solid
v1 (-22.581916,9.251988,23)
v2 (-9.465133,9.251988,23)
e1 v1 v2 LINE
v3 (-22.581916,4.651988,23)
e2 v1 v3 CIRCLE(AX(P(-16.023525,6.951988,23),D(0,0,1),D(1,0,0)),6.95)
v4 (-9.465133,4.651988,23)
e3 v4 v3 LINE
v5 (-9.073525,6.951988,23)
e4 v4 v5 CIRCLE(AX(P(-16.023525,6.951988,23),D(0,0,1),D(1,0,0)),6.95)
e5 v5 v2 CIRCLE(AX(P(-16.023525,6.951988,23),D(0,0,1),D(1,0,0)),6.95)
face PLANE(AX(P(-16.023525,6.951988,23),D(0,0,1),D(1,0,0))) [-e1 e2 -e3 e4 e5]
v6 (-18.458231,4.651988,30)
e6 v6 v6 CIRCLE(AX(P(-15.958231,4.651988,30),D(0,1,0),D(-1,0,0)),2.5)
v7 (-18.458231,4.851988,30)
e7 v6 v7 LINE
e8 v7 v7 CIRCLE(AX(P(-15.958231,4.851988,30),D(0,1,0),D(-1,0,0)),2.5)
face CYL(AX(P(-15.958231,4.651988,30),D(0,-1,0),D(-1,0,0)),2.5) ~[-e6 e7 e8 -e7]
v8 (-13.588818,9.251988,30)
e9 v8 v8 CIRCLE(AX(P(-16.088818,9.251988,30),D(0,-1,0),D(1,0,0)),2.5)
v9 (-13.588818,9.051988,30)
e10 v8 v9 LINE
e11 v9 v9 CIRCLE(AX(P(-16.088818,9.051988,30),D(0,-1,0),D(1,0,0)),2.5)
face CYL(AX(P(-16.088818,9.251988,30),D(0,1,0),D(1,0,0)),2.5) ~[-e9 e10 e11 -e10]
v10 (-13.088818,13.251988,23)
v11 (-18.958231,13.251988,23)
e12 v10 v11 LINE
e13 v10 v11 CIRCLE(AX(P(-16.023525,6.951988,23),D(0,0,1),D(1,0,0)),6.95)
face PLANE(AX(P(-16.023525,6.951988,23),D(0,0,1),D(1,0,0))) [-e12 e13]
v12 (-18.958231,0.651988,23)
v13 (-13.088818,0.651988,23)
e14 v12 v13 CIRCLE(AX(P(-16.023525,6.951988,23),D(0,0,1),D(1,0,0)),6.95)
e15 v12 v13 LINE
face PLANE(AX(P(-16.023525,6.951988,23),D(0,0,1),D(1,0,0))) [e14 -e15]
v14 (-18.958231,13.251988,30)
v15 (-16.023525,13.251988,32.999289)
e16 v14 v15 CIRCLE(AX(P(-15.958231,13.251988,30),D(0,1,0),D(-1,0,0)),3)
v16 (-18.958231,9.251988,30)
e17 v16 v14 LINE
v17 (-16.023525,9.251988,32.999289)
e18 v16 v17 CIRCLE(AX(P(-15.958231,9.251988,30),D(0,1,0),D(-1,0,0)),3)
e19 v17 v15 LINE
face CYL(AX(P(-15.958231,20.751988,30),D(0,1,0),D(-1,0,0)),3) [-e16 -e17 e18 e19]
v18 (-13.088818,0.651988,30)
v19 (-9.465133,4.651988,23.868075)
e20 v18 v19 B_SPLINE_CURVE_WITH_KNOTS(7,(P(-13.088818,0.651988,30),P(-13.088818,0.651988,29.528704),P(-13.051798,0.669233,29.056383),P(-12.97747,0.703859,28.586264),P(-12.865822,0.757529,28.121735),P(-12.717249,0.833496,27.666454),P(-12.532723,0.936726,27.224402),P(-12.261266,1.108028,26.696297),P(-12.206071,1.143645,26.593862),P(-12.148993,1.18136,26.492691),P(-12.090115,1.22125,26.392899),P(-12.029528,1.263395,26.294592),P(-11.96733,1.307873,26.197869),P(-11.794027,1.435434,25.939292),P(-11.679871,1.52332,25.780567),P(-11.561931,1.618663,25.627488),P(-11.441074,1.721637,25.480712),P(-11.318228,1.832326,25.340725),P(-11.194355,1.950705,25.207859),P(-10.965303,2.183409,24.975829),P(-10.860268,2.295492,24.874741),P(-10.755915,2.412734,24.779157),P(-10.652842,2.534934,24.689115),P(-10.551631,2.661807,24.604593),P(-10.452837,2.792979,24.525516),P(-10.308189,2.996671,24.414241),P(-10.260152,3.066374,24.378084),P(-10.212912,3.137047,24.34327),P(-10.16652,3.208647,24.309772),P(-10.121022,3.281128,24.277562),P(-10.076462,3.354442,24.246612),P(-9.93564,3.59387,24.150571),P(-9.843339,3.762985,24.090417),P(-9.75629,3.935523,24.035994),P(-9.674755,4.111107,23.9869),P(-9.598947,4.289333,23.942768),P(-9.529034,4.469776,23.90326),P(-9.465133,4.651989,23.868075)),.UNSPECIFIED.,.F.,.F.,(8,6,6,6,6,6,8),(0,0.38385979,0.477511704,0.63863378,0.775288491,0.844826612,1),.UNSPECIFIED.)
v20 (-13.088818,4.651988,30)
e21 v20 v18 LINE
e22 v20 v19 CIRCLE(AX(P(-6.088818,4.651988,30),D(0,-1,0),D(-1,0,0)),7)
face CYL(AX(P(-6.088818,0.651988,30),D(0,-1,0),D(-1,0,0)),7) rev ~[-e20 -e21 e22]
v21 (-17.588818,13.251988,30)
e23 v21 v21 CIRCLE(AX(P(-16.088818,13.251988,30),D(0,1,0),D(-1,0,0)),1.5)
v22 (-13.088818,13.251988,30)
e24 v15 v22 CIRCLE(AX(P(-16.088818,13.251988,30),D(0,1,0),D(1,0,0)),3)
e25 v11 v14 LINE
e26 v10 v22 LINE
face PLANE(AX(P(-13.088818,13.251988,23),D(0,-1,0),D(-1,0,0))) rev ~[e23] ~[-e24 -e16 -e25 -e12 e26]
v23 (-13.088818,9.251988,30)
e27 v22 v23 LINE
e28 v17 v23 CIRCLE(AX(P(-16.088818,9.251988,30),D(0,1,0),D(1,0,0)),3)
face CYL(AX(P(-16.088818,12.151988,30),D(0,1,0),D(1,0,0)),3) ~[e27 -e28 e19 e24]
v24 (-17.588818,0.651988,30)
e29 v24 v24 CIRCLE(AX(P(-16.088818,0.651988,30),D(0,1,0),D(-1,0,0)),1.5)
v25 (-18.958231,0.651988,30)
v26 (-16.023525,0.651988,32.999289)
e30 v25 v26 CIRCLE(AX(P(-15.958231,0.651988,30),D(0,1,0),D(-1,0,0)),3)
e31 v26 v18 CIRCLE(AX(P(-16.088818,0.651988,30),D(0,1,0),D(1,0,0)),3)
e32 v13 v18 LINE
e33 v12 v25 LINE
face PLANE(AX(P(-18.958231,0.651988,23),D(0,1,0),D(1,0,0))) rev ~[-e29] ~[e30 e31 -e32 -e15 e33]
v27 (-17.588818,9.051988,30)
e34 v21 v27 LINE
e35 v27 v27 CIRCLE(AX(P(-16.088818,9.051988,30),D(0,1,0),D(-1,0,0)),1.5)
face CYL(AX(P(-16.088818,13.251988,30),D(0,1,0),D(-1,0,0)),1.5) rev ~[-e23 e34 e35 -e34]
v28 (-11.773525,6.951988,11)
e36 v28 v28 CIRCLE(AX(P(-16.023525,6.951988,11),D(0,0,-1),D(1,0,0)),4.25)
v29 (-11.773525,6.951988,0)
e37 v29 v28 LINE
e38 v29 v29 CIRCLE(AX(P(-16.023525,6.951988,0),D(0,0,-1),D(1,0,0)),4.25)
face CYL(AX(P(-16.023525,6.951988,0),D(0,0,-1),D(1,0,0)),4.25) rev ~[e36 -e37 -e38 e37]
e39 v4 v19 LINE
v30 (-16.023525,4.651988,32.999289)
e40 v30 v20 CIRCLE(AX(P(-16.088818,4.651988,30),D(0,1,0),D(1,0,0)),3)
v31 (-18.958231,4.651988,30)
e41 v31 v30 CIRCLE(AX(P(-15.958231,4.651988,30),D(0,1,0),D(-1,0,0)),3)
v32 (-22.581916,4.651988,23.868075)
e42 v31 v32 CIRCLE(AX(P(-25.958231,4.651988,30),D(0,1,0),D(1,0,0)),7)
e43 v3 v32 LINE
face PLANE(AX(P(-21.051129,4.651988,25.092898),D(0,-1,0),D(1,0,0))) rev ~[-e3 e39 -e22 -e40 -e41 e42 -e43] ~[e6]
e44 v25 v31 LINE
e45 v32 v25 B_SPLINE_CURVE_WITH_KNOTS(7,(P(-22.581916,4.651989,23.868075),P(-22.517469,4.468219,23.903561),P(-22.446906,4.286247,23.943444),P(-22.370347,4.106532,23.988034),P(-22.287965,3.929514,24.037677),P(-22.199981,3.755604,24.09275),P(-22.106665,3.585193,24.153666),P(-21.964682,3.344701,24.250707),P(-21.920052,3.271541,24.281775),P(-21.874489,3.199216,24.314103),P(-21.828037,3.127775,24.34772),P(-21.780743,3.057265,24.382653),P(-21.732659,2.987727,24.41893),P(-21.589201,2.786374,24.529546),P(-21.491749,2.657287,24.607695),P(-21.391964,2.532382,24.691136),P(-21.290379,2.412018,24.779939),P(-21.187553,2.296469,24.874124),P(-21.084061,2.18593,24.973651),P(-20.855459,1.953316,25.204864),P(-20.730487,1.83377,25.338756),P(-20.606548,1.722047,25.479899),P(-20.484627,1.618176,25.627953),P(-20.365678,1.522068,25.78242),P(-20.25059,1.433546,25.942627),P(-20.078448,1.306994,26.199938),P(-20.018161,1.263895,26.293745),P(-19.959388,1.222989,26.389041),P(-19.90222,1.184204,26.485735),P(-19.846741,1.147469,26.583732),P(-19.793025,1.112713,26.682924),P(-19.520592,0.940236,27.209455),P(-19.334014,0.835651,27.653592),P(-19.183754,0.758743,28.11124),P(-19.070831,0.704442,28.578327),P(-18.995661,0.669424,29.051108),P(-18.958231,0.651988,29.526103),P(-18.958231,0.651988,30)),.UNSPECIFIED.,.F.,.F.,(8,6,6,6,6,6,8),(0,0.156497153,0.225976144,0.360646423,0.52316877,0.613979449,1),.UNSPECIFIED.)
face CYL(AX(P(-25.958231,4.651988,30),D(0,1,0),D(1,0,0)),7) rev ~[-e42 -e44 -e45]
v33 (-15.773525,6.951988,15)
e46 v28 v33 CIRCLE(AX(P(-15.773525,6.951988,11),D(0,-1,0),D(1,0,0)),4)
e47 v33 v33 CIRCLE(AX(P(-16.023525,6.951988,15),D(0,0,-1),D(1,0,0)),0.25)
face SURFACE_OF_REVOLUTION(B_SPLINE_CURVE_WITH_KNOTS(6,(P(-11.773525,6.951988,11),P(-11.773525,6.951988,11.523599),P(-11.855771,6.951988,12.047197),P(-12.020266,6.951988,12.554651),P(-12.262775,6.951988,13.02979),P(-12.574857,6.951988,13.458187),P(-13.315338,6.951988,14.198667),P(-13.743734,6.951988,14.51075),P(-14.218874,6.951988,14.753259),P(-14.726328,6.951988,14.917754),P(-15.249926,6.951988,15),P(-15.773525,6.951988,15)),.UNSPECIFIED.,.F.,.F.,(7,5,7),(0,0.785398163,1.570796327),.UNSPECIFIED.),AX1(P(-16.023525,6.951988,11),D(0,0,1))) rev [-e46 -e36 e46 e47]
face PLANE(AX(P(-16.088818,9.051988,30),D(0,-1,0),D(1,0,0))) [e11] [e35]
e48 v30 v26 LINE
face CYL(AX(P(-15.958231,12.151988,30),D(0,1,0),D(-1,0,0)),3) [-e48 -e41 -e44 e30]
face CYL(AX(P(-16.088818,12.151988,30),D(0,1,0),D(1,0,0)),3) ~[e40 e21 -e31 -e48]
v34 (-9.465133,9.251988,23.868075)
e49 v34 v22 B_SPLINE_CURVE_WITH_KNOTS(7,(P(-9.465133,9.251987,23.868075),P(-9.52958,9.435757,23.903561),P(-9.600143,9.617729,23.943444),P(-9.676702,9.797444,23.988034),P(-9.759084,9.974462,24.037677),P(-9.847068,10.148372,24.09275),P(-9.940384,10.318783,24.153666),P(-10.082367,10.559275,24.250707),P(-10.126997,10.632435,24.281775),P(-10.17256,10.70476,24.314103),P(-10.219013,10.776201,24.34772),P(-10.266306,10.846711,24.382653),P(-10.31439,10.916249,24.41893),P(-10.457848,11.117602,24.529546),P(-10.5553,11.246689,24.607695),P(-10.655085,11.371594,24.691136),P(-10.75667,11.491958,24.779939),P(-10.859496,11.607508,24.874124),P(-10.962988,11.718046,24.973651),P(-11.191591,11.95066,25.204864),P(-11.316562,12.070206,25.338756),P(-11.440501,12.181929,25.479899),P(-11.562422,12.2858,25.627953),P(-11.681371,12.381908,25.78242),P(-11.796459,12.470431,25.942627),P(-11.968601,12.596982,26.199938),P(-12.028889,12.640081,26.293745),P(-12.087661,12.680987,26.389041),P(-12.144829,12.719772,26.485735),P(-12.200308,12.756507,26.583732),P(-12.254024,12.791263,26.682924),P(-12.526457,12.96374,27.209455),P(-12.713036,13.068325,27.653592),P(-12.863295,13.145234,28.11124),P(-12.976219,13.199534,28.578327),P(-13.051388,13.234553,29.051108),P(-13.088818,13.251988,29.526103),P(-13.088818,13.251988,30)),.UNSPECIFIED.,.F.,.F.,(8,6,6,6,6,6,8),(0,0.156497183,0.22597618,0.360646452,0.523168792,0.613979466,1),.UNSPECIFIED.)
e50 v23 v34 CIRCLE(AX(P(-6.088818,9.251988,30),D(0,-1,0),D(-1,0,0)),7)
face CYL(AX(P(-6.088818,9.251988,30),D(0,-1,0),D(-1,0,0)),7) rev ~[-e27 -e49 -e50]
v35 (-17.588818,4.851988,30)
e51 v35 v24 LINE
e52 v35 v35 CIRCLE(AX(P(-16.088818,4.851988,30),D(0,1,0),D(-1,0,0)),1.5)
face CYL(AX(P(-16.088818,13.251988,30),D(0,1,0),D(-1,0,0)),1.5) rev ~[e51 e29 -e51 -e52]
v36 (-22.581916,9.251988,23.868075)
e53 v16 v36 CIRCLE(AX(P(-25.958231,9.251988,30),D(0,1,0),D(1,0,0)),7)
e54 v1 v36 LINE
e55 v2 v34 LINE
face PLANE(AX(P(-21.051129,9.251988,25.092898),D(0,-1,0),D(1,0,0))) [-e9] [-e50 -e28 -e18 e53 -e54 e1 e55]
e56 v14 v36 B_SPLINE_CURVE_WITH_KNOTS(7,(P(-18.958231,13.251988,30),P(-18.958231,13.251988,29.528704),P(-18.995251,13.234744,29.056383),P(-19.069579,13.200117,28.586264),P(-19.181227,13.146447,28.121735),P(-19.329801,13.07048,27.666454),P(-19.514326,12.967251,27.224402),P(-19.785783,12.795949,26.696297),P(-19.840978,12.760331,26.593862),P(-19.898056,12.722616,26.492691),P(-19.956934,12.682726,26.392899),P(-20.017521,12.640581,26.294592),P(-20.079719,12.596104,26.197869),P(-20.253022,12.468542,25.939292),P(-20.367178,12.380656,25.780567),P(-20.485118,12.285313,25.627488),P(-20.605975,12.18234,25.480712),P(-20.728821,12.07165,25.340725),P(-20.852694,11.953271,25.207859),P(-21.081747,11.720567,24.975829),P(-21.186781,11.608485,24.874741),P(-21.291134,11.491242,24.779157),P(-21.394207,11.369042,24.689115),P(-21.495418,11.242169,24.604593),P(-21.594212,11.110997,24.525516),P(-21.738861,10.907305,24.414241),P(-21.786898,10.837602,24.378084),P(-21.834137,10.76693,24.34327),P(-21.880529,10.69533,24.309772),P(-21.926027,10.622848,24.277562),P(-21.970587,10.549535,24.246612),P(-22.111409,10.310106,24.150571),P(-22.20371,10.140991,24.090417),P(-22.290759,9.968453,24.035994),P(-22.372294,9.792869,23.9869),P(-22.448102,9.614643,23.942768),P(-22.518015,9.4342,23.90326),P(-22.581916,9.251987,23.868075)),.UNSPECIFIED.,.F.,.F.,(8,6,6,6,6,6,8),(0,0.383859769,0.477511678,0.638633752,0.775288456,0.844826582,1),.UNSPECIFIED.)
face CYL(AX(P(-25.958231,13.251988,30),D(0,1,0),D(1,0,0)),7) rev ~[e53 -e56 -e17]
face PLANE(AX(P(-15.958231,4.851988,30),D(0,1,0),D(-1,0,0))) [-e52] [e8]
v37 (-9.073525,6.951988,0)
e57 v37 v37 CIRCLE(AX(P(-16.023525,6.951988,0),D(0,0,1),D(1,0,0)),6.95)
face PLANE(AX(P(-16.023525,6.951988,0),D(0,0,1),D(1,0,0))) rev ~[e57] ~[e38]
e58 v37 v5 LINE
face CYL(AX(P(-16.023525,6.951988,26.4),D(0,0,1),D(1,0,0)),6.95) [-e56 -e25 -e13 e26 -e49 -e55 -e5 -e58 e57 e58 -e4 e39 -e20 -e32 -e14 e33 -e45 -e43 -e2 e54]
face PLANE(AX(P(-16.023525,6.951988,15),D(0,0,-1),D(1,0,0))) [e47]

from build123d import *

# Parameters (mm, degrees)
F0_R         = 6.95
F1_DEPTH     = 23
F2_W         = 2.9347061182
F2_H         = 4
F3_DEPTH     = 10
F4_T1_DEPTH  = 19
F4_T3_DEPTH  = 19
F5_T4_DEPTH  = 4
F5_S5_R      = 6.95
F5_T6_DEPTH  = 7
F5_T10_DEPTH = 4
F5_S11_R     = 6.95
F5_T12_DEPTH = 7
F5_T16_DEPTH = 4
F5_S17_R     = 6.95
F5_T18_DEPTH = 7
F5_T22_DEPTH = 4
F5_S23_R     = 6.95
F5_T24_DEPTH = 7
F6_R         = 4.25
F7_DEPTH     = 15
F8_R         = 4
F10_R        = 2.5
F11_DEPTH    = 0.2
F12_R        = 2.5
F13_DEPTH    = 0.2
F9_R         = 1.5
F14_DEPTH    = 13.2510001


# Not quite as in the source:
# - a fillet or chamfer that OpenCascade refuses, or shapes differently, is made with other operations: its cross-section is extruded or revolved along the edge and cut away or added


with BuildPart() as f1:
    # F0 (on Top) → F1 (new body)
    with BuildSketch(Plane.XY):
        with Locations((-16.023524542, 6.9519880981)):
            Circle(F0_R)
    extrude(amount=F1_DEPTH)

    # F2 (on face) → F3 (join)
    with BuildSketch(Plane.XY.offset(23)):
        with Locations((-17.490877601, 11.2519880981)):
            Rectangle(F2_W, F2_H)
        with Locations((-14.5561714829, 11.2519880981)):
            Rectangle(F2_W, F2_H)
        with Locations((-17.490877601, 2.6519880981)):
            Rectangle(F2_W, F2_H)
        with Locations((-14.5561714829, 2.6519880981)):
            Rectangle(F2_W, F2_H)
    extrude(amount=F3_DEPTH)

    # F4: fillet of radius 3 on 4 edges, made by hand

    # F4_s2 → F4_t1 (cut)
    with BuildSketch(Plane.XZ.offset(-12.1519880981)):
        with BuildLine():
            ThreePointArc((-13.0888184238, 30), (-13.9674980802, 32.1213203436), (-16.0888184238, 33))
            Line((-16.0888184238, 33), (-13.0888184238, 33))
            Line((-13.0888184238, 33), (-13.0888184238, 30))
        make_face()
        with BuildLine():
            ThreePointArc((-18.9582306601, 30), (-18.0795510037, 32.1213203436), (-15.9582306601, 33))
            Line((-15.9582306601, 33), (-18.9582306601, 33))
            Line((-18.9582306601, 33), (-18.9582306601, 30))
        make_face()
    extrude(amount=F4_T1_DEPTH, mode=Mode.SUBTRACT)

    # F4_s4 → F4_t3 (cut)
    with BuildSketch(Plane.XZ.offset(-20.7519880981)):
        with BuildLine():
            ThreePointArc((-13.0888184238, 30), (-13.9674980802, 32.1213203436), (-16.0888184238, 33))
            Line((-16.0888184238, 33), (-13.0888184238, 33))
            Line((-13.0888184238, 33), (-13.0888184238, 30))
        make_face()
        with BuildLine():
            ThreePointArc((-18.9582306601, 30), (-18.0795510037, 32.1213203436), (-15.9582306601, 33))
            Line((-15.9582306601, 33), (-18.9582306601, 33))
            Line((-18.9582306601, 33), (-18.9582306601, 30))
        make_face()
    extrude(amount=F4_T3_DEPTH, mode=Mode.SUBTRACT)

    # F5: fillet of radius 7 on 4 edges, made by hand


with BuildPart() as f5_tool2:
    # F5_s3 → F5_t4 (new body)
    with BuildSketch(Plane.XZ.offset(-0.6519880981)):
        with BuildLine():
            ThreePointArc((-13.0888184238, 30), (-11.0385658921, 25.0502525317), (-6.0888184238, 23))
            Line((-6.0888184238, 23), (-6.0888184238, 22.86))
            Line((-6.0888184238, 22.86), (-13.2288184238, 22.86))
            Line((-13.2288184238, 22.86), (-13.2288184238, 30))
            Line((-13.2288184238, 30), (-13.0888184238, 30))
        make_face()
    extrude(amount=-F5_T4_DEPTH)

    # F5_s5 → F5_t6 (intersect, symmetric)
    with BuildSketch(Plane.XY.offset(26.4)):
        with Locations((-16.023524542, 6.9519880981)):
            Circle(F5_S5_R)
    extrude(amount=F5_T6_DEPTH, both=True, mode=Mode.INTERSECT)


with BuildPart() as f1_1:
    add(f1.part)

    # F5_t1: union F5_tool2
    add(f5_tool2.part)


with BuildPart() as f5_tool8:
    # F5_s9 → F5_t10 (new body)
    with BuildSketch(Plane.XZ.offset(-9.2519880981)):
        with BuildLine():
            ThreePointArc((-13.0888184238, 30), (-11.0385658921, 25.0502525317), (-6.0888184238, 23))
            Line((-6.0888184238, 23), (-6.0888184238, 22.86))
            Line((-6.0888184238, 22.86), (-13.2288184238, 22.86))
            Line((-13.2288184238, 22.86), (-13.2288184238, 30))
            Line((-13.2288184238, 30), (-13.0888184238, 30))
        make_face()
    extrude(amount=-F5_T10_DEPTH)

    # F5_s11 → F5_t12 (intersect, symmetric)
    with BuildSketch(Plane.XY.offset(26.4)):
        with Locations((-16.023524542, 6.9519880981)):
            Circle(F5_S11_R)
    extrude(amount=F5_T12_DEPTH, both=True, mode=Mode.INTERSECT)


with BuildPart() as f1_2:
    add(f1_1.part)

    # F5_t7: union F5_tool8
    add(f5_tool8.part)


with BuildPart() as f5_tool14:
    # F5_s15 → F5_t16 (new body)
    with BuildSketch(Plane.XZ.offset(-13.2519880981)):
        with BuildLine():
            ThreePointArc((-18.9582306601, 30), (-21.0084831918, 25.0502525317), (-25.9582306601, 23))
            Line((-25.9582306601, 23), (-25.9582306601, 22.86))
            Line((-25.9582306601, 22.86), (-18.8182306601, 22.86))
            Line((-18.8182306601, 22.86), (-18.8182306601, 30))
            Line((-18.8182306601, 30), (-18.9582306601, 30))
        make_face()
    extrude(amount=F5_T16_DEPTH)

    # F5_s17 → F5_t18 (intersect, symmetric)
    with BuildSketch(Plane.XY.offset(26.4)):
        with Locations((-16.023524542, 6.9519880981)):
            Circle(F5_S17_R)
    extrude(amount=F5_T18_DEPTH, both=True, mode=Mode.INTERSECT)


with BuildPart() as f1_3:
    add(f1_2.part)

    # F5_t13: union F5_tool14
    add(f5_tool14.part)


with BuildPart() as f5_tool20:
    # F5_s21 → F5_t22 (new body)
    with BuildSketch(Plane.XZ.offset(-4.6519880981)):
        with BuildLine():
            ThreePointArc((-18.9582306601, 30), (-21.0084831918, 25.0502525317), (-25.9582306601, 23))
            Line((-25.9582306601, 23), (-25.9582306601, 22.86))
            Line((-25.9582306601, 22.86), (-18.8182306601, 22.86))
            Line((-18.8182306601, 22.86), (-18.8182306601, 30))
            Line((-18.8182306601, 30), (-18.9582306601, 30))
        make_face()
    extrude(amount=F5_T22_DEPTH)

    # F5_s23 → F5_t24 (intersect, symmetric)
    with BuildSketch(Plane.XY.offset(26.4)):
        with Locations((-16.023524542, 6.9519880981)):
            Circle(F5_S23_R)
    extrude(amount=F5_T24_DEPTH, both=True, mode=Mode.INTERSECT)


with BuildPart() as f1_4:
    add(f1_3.part)

    # F5_t19: union F5_tool20
    add(f5_tool20.part)

    # F6 (on face) → F7 (cut)
    with BuildSketch(Plane(origin=(0, 0, 0), x_dir=(1, 0, 0), z_dir=(0, 0, -1))):
        with Locations((-16.023524542, -6.9519880981)):
            Circle(F6_R)
    extrude(amount=-F7_DEPTH, mode=Mode.SUBTRACT)

    # F8
    f8_edges = [f1_4.edges().sort_by_distance(p)[0] for p in [
        (-20.273525, 6.951988, 15),
    ]]
    fillet(f8_edges, radius=F8_R)

    # F10 (on face) → F11 (join)
    with BuildSketch(Plane(origin=(0, 4.6519880981, 0), x_dir=(-1, 0, 0), z_dir=(0, 1, 0))):
        with Locations((15.9582306601, 30)):
            Circle(F10_R)
    extrude(amount=F11_DEPTH)

    # F12 (on face) → F13 (join)
    with BuildSketch(Plane.XZ.offset(-9.2519880981)):
        with Locations((-16.0888184238, 30)):
            Circle(F12_R)
    extrude(amount=F13_DEPTH)

    # F9 (on face) → F14 (cut, through all)
    with BuildSketch(Plane(origin=(0, 13.2519880981, 0), x_dir=(-1, 0, 0), z_dir=(0, 1, 0))):
        with Locations((16.0888184238, 30)):
            Circle(F9_R)
    extrude(amount=-F14_DEPTH, mode=Mode.SUBTRACT)


solid = f1_4.part
